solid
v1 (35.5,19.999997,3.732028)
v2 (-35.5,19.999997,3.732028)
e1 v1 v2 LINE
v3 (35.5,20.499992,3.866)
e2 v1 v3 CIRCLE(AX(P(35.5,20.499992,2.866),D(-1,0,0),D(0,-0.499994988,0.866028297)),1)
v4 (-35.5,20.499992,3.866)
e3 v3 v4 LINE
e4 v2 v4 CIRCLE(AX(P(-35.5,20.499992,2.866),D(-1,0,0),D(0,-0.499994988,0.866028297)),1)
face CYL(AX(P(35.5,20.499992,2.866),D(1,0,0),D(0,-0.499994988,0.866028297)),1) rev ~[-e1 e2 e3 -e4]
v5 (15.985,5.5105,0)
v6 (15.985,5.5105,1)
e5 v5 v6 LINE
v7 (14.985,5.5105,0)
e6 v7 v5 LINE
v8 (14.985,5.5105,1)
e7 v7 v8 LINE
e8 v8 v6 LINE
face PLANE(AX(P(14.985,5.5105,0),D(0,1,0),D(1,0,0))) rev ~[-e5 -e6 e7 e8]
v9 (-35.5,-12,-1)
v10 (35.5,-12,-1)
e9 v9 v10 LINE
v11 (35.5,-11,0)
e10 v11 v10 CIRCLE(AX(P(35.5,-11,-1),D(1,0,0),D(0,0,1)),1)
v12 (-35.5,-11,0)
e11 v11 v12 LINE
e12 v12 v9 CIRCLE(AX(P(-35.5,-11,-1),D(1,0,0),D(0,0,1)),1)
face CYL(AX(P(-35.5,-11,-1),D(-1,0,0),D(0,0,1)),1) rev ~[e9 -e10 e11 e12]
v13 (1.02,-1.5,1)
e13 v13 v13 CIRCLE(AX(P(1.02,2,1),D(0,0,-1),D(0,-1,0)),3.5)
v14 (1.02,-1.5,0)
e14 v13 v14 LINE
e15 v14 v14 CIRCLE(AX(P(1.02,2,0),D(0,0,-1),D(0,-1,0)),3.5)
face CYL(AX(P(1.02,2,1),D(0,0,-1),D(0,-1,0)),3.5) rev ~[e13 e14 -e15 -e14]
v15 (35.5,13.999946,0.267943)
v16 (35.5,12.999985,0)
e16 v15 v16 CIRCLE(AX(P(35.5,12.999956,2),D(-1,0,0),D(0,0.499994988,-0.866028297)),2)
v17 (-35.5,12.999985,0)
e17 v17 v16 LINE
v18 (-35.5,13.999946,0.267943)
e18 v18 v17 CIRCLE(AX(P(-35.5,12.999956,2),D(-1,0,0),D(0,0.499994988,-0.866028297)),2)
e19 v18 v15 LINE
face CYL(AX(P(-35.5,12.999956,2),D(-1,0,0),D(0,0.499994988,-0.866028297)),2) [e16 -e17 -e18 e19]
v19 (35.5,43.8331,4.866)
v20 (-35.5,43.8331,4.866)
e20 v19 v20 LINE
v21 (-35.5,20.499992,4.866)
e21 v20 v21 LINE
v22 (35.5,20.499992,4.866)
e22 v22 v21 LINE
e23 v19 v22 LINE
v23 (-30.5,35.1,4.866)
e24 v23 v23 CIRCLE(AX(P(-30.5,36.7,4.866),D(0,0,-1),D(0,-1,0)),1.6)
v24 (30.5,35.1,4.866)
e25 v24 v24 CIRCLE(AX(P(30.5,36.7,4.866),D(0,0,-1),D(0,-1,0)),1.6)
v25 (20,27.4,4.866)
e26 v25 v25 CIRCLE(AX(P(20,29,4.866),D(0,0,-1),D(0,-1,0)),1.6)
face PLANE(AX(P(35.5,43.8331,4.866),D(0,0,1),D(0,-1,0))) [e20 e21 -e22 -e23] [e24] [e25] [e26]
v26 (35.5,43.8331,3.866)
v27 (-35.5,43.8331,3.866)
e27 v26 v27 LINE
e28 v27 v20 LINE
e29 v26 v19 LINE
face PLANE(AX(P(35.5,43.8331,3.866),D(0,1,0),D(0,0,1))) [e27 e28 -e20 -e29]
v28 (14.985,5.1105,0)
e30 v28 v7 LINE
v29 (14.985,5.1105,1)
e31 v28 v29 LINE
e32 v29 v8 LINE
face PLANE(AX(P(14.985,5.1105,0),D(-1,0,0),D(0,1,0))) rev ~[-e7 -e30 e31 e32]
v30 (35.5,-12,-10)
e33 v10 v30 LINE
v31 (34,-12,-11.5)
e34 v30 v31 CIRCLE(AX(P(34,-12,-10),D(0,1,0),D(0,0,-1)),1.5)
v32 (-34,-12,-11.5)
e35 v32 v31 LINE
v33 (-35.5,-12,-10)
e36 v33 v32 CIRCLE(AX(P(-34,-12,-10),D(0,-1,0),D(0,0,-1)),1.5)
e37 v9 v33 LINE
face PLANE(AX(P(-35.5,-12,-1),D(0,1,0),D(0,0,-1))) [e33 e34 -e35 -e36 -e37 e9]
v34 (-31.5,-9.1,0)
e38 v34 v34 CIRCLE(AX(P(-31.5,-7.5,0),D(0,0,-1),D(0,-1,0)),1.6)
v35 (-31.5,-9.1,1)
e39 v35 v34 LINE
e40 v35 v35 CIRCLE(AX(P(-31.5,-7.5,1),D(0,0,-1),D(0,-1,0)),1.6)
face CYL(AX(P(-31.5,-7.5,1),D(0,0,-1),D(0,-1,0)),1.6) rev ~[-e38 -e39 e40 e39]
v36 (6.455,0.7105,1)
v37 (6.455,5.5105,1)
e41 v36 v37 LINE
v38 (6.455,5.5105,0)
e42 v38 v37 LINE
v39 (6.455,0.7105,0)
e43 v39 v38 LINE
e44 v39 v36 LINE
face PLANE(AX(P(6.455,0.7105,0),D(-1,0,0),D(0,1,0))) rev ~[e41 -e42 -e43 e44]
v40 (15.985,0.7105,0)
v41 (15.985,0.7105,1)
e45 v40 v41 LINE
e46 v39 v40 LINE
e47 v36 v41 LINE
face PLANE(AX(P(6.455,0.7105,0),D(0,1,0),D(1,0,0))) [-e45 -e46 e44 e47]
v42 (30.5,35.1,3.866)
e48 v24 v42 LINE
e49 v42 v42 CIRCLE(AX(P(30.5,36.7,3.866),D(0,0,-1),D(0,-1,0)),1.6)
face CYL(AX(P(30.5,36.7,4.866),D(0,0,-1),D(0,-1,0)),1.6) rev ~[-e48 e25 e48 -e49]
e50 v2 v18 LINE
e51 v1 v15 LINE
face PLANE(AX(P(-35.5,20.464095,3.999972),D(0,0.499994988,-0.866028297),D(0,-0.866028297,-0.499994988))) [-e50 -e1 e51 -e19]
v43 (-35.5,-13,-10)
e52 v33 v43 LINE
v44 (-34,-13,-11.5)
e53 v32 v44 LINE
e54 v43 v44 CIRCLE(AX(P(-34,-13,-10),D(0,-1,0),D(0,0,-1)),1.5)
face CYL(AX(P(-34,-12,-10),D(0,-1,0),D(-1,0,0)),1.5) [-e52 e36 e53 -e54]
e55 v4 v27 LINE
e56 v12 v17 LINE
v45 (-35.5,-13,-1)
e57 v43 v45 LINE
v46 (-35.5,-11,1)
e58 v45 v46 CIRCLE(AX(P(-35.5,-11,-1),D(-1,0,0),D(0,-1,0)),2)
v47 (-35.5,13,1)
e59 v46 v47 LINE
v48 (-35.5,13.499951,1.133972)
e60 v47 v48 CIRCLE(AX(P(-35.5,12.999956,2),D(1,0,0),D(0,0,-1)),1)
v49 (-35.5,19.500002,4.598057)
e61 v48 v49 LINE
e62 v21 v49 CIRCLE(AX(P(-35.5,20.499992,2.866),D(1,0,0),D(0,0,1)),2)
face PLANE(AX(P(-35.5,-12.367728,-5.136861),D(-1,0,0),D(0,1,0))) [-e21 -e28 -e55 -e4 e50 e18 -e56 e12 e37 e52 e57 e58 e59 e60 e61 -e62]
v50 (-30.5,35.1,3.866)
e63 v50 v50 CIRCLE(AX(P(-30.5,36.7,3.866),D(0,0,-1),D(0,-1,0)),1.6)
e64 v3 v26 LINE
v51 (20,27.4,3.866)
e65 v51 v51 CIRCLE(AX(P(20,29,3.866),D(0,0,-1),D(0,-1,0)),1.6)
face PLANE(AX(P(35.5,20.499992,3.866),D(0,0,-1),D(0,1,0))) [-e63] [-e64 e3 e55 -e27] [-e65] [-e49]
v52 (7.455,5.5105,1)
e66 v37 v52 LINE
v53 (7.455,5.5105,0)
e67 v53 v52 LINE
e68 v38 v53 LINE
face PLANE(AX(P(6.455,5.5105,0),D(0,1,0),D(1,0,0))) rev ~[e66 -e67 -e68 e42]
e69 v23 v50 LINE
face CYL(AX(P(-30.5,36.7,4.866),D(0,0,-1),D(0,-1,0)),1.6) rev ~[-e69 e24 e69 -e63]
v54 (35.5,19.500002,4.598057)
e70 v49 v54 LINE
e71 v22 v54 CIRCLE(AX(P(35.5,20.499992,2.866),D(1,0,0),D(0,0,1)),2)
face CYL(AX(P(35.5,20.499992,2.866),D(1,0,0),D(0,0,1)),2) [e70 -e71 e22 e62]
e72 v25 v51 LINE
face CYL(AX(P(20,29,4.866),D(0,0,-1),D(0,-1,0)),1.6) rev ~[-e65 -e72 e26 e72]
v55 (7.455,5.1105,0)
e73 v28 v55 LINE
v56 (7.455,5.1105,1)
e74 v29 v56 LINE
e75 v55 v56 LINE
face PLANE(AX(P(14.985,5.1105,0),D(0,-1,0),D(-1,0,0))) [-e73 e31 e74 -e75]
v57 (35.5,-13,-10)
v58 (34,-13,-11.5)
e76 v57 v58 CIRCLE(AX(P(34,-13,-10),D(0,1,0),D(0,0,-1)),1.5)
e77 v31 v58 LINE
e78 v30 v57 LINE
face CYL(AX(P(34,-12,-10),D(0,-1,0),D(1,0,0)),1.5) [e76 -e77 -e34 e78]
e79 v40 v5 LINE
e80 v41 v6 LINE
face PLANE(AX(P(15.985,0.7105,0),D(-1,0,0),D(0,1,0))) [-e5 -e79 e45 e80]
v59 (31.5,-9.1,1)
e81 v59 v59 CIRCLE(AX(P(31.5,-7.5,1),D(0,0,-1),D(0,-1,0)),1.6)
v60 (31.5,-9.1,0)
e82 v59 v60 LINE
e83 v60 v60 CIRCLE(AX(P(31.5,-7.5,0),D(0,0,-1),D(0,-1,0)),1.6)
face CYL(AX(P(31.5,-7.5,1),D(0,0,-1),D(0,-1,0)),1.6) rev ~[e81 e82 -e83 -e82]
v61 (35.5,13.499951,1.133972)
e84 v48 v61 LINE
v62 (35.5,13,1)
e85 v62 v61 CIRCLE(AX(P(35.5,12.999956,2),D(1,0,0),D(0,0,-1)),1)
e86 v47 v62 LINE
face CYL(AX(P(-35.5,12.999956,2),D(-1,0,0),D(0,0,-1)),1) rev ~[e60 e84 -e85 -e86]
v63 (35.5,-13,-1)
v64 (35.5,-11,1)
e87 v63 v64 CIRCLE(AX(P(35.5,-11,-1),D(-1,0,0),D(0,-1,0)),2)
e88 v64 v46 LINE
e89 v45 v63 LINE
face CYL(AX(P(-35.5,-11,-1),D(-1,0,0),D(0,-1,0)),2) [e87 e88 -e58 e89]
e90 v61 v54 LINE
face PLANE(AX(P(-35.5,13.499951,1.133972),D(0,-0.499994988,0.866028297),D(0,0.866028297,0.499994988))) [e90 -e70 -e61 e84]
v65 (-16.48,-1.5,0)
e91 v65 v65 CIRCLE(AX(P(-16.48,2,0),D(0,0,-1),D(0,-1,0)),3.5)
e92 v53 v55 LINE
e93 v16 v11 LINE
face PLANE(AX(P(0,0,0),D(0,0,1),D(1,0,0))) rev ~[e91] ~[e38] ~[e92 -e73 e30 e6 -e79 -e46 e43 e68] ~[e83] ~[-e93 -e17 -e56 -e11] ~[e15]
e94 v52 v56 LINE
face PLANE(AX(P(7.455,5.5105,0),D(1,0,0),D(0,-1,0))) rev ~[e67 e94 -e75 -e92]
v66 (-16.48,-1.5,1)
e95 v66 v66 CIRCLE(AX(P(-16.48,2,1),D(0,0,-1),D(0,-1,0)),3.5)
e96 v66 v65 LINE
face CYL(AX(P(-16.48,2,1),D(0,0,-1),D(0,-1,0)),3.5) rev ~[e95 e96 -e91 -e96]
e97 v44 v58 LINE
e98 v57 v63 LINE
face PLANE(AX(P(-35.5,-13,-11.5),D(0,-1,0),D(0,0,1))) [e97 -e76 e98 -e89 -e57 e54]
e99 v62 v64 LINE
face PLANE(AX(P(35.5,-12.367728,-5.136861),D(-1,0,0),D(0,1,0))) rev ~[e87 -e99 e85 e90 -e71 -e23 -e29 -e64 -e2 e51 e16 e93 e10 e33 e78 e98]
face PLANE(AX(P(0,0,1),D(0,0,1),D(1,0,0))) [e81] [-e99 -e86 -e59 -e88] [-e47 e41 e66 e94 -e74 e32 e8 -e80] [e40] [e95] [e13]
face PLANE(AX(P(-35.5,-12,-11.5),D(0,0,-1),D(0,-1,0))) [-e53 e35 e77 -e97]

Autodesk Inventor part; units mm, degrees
ref_plane "YZ Plane" through (0, 0, 0) normal (1, 0, 0) x (0, 1, 0)
ref_plane "XZ Plane" through (0, 0, 0) normal (0, 1, 0) x (-1, 0, 0)
ref_plane "XY Plane" through (0, 0, 0) normal (0, 0, 1) x (1, 0, 0)
sketch "Sketch1" plane through (0, 0, 0) normal (0, 0, 1) x (1, 0, 0)
  line L0 (0, 18.2) -> (0, -18.2) construction
  line L1 (-49.7, 0) -> (49.7, 0) construction
  line L2 (-35.5, 13) -> (35.5, 13)
  line L3 (35.5, 13) -> (35.5, -13)
  line L4 (35.5, -13) -> (-35.5, -13)
  line L5 (-35.5, -13) -> (-35.5, 13)
  line L6 (-35.5, 13) -> (35.5, -13) construction
  line L7 (35.5, 13) -> (-35.5, -13) construction
  line L8 (14.985, 5.1105) -> (14.985, 5.5105) projected
  line L9 (14.985, 5.1105) -> (7.455, 5.1105) projected
  line L10 (7.455, 5.5105) -> (7.455, 5.1105) projected
  line L11 (6.455, 5.5105) -> (7.455, 5.5105) projected
  line L12 (6.455, 0.7105) -> (6.455, 5.5105) projected
  line L13 (6.455, 0.7105) -> (15.985, 0.7105) projected
  line L14 (15.985, 0.7105) -> (15.985, 5.5105) projected
  line L15 (14.985, 5.5105) -> (15.985, 5.5105) projected
  point P0 (0, 0)
  dimension "d0" = 71
  dimension "d1" = 26
extrude "Plate1" add sketch "Sketch1" along normal blind 1
sketch "Sketch2" plane through (-35.5, 13.5, 1.134) normal (0, 0.5, -0.8660254) x (-1, 0, 0)
  line L0 (-71, 0) -> (0, 0)
  line L1 (0, 0) -> (0, 7.4641)
  line L2 (0, 7.4641) -> (-71, 7.4641)
  line L3 (-71, 7.4641) -> (-71, 0)
edge flange "Flange1" height 8 angle 30 thickness 1 bend radius 1 thickness toward (0, 0.5, -0.8660254) relief tear relief width 1 relief depth 0.5 edges at (0, 13, 1) wall of the first edge with corners at (35.5, 13.5, 1.134) (-35.5, 13.5, 1.134) (-35.5, 19.9641, 4.866) (35.5, 19.9641, 4.866)
bend "Bend1"
corner "Corner1"
sketch "Sketch3" plane through (35.5, 19.9641, 3.866) normal (0, 0, 1) x (1, 0, 0)
  line L0 (-71, 0) -> (0, 0)
  line L1 (0, 0) -> (0, 23.869)
  line L2 (0, 23.869) -> (-71, 23.869)
  line L3 (-71, 23.869) -> (-71, 0)
edge flange "Flange2" height 23.869 angle 30 thickness 1 bend radius 1 thickness toward (0, 0, 1) relief tear relief width 1 relief depth 0.5 edges at (0, 20.4641, 4) wall of the first edge with corners at (-35.5, 19.9641, 3.866) (35.5, 19.9641, 3.866) (35.5, 43.8331, 3.866) (-35.5, 43.8331, 3.866)
bend "Bend2"
corner "Corner2"
sketch "Sketch4" plane through (-35.5, -12, 1) normal (0, -1, 0) x (1, 0, 0)
  line L0 (71, 0) -> (0, 0)
  line L1 (0, 0) -> (0, -12.5)
  line L2 (0, -12.5) -> (71, -12.5)
  line L3 (71, -12.5) -> (71, 0)
edge flange "Flange3" height 12.5 angle 90 thickness 1 bend radius 1 thickness toward (0, -1, 0) relief tear relief width 1 relief depth 0.5 edges at (0, -13, 0) wall of the first edge with corners at (35.5, -12, 1) (-35.5, -12, 1) (-35.5, -12, -11.5) (35.5, -12, -11.5)
bend "Bend3"
corner "Corner3"
fillet "Fillet1" radius 1.5 2 edges at (-35.5, -12.5, -11.5) (35.5, -12.5, -11.5)
sketch "Sketch5" plane through (-35.5, 43.8331, 4.866) normal (0, 0, 1) x (1, 0, 0)
  circle A0 centre (5, -7.1331) radius 1.6 projected
  circle A1 centre (66, -7.1331) radius 1.6 projected
  circle A2 centre (55.5, -14.8331) radius 1.5 projected
  point P0 (35.5, -43.8331)
hole "Hole3" at (-30.5, 36.7, 4.866) at (20, 29, 4.866) at (30.5, 36.7, 4.866) direction (0, 0, -1) diameter 3.2 end through all
sketch "Sketch6" plane through (0, 0, 1) normal (0, 0, 1) x (1, 0, 0)
  circle A0 centre (-16.48, 2) radius 2.286 projected
  circle A1 centre (1.02, 2) radius 2.286 projected
  circle A2 centre (-31.5, -7.5) radius 1.6 projected
  circle A3 centre (31.5, -7.5) radius 1.6 projected
  point P0 (0, 0)
hole "Hole4" at (-31.5, -7.5, 1) at (31.5, -7.5, 1) direction (0, 0, -1) diameter 3.2 end through all
hole "Hole5" at (1.02, 2, 1) at (-16.48, 2, 1) direction (0, 0, -1) diameter 7 end through all
equation "\"d62\" = Thickness"
equation "\"d2\" = Thickness"
equation "\"d3\" = BendReliefWidth"
equation "\"d4\" = BendReliefDepth"
equation "\"d5\" = MinimumRemnant"
equation "\"d6\" = TransitionRadius"
equation "\"d9\" = BendRadius"
equation "\"d10\" = CornerReliefSize"
equation "\"d11\" = GapSize"
equation "\"d12\" = JacobiRadiusSize"
equation "\"d13\" = BendReliefWidth"
equation "\"d14\" = BendReliefDepth"
equation "\"d15\" = MinimumRemnant"
equation "\"d16\" = TransitionRadius"
equation "\"d19\" = BendRadius"
equation "\"d20\" = CornerReliefSize"
equation "\"d21\" = GapSize"
equation "\"d22\" = JacobiRadiusSize"
equation "\"d23\" = BendReliefWidth"
equation "\"d24\" = BendReliefDepth"
equation "\"d25\" = MinimumRemnant"
equation "\"d26\" = TransitionRadius"
equation "\"d29\" = BendRadius"
equation "\"d30\" = CornerReliefSize"
equation "\"d31\" = GapSize"
equation "\"d32\" = JacobiRadiusSize"
equation "\"BendRadius\" = Thickness"
equation "\"BendReliefWidth\" = Thickness"
equation "\"BendReliefDepth\" = 0.5 * Thickness"
equation "\"CornerReliefSize\" = 4 * Thickness"
equation "\"MinimumRemnant\" = 2 * Thickness"
equation "\"TransitionRadius\" = BendRadius"
equation "\"JacobiRadiusSize\" = BendRadius"
equation "\"GapSize\" = Thickness"
equation "\"Thickness\" = 1"
properties part number "Enclosure-Cap"
